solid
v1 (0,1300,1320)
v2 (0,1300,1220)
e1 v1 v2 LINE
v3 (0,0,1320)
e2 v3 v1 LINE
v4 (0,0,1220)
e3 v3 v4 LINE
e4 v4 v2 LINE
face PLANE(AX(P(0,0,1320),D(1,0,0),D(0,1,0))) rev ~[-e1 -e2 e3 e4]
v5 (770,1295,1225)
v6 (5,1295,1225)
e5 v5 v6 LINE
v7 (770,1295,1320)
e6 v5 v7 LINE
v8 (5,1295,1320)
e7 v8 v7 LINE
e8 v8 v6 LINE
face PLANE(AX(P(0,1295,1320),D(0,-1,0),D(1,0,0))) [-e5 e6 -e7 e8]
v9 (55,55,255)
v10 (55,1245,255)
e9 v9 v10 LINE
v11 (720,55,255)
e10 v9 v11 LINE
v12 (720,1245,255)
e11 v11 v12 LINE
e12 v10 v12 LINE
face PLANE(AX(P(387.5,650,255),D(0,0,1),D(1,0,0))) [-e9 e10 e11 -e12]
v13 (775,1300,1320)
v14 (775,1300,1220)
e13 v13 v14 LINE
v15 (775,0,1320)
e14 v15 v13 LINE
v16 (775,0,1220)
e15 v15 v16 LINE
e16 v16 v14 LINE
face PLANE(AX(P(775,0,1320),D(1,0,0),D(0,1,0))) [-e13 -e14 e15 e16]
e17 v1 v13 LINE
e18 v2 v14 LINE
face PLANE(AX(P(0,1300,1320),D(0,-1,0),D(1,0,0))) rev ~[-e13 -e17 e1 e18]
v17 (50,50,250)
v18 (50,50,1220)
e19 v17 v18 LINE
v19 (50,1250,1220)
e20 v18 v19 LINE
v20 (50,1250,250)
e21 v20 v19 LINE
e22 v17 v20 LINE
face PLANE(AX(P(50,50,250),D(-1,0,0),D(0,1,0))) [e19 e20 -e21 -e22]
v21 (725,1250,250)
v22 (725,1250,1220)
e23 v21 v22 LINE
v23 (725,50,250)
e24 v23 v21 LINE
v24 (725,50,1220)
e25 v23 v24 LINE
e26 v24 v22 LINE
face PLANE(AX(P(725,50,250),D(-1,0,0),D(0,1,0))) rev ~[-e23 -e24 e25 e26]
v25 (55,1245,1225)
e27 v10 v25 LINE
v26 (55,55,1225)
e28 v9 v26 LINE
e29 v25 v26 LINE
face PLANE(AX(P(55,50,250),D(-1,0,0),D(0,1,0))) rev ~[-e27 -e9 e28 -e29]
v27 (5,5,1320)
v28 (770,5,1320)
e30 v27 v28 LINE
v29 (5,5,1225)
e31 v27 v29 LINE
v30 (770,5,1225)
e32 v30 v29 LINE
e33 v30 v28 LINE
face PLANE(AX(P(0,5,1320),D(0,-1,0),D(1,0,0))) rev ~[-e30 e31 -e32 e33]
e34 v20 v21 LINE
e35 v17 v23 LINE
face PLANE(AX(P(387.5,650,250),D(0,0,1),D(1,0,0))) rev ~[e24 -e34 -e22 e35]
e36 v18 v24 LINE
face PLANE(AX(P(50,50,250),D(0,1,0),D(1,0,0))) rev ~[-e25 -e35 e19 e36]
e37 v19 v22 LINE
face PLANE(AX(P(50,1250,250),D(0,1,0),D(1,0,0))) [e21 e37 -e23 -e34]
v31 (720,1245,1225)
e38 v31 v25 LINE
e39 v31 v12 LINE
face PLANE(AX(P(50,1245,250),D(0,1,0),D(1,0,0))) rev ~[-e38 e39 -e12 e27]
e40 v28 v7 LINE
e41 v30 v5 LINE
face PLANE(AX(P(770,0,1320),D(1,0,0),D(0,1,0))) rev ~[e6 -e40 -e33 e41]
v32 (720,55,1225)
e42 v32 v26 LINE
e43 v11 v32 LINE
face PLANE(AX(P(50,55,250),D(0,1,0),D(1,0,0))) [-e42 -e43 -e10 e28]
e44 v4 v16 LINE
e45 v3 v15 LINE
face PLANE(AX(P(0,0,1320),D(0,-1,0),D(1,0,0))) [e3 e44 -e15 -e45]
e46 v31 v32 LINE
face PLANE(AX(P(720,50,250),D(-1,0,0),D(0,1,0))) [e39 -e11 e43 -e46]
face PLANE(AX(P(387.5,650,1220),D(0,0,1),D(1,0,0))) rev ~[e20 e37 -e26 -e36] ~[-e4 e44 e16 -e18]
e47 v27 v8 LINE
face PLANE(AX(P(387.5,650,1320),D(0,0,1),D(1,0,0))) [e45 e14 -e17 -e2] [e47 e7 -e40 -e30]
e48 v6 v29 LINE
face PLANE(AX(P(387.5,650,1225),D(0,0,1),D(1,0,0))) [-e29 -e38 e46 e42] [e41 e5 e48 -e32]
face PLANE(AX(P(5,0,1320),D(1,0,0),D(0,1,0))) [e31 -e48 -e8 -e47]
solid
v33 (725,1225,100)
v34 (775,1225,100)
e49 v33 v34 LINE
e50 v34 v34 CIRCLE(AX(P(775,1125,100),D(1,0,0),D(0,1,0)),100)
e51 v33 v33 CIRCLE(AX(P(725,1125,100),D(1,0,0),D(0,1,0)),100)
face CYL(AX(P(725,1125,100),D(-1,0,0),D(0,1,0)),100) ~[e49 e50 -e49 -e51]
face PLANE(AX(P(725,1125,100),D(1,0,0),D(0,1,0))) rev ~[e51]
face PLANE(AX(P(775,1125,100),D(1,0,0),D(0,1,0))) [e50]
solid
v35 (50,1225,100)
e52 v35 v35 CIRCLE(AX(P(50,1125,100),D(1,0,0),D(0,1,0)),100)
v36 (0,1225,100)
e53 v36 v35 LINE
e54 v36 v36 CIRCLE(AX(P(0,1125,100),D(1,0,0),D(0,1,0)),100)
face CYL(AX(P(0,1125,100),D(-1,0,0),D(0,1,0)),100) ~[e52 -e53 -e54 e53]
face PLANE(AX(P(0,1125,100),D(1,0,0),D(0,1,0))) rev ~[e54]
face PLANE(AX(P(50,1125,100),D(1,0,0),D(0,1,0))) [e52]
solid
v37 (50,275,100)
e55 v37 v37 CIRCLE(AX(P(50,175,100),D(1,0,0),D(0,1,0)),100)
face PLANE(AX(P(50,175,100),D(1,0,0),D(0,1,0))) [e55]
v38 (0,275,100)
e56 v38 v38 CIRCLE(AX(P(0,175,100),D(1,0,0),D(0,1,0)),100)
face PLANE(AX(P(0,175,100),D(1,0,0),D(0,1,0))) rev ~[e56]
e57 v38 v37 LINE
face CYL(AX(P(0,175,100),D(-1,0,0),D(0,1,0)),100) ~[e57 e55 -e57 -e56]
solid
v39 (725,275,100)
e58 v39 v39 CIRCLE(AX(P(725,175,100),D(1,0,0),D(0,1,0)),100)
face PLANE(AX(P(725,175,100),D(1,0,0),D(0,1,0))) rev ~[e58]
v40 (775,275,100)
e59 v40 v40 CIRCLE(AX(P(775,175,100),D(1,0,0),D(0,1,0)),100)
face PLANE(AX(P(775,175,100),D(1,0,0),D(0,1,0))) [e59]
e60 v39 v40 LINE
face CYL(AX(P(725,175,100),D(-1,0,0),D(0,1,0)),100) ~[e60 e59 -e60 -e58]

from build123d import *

# Parameters (mm, degrees)
F1_W     = 675
F1_H     = 1200
F2_DEPTH = 1070
F3_W     = 775
F3_H     = 1300
F3_W_2   = 675
F3_H_2   = 1200
F4_DEPTH = 100
F5_T     = -5
F6_R     = 100
F7_DEPTH = 50
F8_R     = 100
F9_DEPTH = 50


# Not quite as in the source:
# - a feature names something its author has since deleted; it is built from what else it names


with BuildPart() as f2:
    # F1 (on offset) → F2 (new body)
    with BuildSketch(Plane.XY.offset(250)):
        with Locations((387.5, 650)):
            Rectangle(F1_W, F1_H)
    extrude(amount=F2_DEPTH)

    # F3 (on face) → F4 (join)
    with BuildSketch(Plane.XY.offset(1320)):
        with Locations((387.5, 650)):
            Rectangle(F3_W, F3_H)
        with Locations((387.5, 650)):
            Rectangle(F3_W_2, F3_H_2, mode=Mode.SUBTRACT)
    extrude(amount=-F4_DEPTH)

    # F5
    f5_openings = [f2.faces().sort_by_distance(p)[0] for p in [
        (387.5, 650, 1320),
    ]]
    offset(amount=F5_T, openings=f5_openings, kind=Kind.INTERSECTION)


with BuildPart() as f7:
    # F6 (on Right) → F7 (new body, through all)
    with BuildSketch(Plane.YZ):
        with Locations((1125, 100)):
            Circle(F6_R)
    extrude(amount=F7_DEPTH)


with BuildPart() as f7b:
    # F6 (on Right) → F7, piece 2 (new body, through all)
    with BuildSketch(Plane.YZ):
        with Locations((175, 100)):
            Circle(F6_R)
    extrude(amount=F7_DEPTH)


with BuildPart() as f9:
    # F8 (on face) → F9 (new body, through all)
    with BuildSketch(Plane.YZ.offset(725)):
        with Locations((1125, 100)):
            Circle(F8_R)
    extrude(amount=F9_DEPTH)


with BuildPart() as f9b:
    # F8 (on face) → F9, piece 2 (new body, through all)
    with BuildSketch(Plane.YZ.offset(725)):
        with Locations((175, 100)):
            Circle(F8_R)
    extrude(amount=F9_DEPTH)


solid = Compound([f2.part, f7.part, f7b.part, f9.part, f9b.part])
